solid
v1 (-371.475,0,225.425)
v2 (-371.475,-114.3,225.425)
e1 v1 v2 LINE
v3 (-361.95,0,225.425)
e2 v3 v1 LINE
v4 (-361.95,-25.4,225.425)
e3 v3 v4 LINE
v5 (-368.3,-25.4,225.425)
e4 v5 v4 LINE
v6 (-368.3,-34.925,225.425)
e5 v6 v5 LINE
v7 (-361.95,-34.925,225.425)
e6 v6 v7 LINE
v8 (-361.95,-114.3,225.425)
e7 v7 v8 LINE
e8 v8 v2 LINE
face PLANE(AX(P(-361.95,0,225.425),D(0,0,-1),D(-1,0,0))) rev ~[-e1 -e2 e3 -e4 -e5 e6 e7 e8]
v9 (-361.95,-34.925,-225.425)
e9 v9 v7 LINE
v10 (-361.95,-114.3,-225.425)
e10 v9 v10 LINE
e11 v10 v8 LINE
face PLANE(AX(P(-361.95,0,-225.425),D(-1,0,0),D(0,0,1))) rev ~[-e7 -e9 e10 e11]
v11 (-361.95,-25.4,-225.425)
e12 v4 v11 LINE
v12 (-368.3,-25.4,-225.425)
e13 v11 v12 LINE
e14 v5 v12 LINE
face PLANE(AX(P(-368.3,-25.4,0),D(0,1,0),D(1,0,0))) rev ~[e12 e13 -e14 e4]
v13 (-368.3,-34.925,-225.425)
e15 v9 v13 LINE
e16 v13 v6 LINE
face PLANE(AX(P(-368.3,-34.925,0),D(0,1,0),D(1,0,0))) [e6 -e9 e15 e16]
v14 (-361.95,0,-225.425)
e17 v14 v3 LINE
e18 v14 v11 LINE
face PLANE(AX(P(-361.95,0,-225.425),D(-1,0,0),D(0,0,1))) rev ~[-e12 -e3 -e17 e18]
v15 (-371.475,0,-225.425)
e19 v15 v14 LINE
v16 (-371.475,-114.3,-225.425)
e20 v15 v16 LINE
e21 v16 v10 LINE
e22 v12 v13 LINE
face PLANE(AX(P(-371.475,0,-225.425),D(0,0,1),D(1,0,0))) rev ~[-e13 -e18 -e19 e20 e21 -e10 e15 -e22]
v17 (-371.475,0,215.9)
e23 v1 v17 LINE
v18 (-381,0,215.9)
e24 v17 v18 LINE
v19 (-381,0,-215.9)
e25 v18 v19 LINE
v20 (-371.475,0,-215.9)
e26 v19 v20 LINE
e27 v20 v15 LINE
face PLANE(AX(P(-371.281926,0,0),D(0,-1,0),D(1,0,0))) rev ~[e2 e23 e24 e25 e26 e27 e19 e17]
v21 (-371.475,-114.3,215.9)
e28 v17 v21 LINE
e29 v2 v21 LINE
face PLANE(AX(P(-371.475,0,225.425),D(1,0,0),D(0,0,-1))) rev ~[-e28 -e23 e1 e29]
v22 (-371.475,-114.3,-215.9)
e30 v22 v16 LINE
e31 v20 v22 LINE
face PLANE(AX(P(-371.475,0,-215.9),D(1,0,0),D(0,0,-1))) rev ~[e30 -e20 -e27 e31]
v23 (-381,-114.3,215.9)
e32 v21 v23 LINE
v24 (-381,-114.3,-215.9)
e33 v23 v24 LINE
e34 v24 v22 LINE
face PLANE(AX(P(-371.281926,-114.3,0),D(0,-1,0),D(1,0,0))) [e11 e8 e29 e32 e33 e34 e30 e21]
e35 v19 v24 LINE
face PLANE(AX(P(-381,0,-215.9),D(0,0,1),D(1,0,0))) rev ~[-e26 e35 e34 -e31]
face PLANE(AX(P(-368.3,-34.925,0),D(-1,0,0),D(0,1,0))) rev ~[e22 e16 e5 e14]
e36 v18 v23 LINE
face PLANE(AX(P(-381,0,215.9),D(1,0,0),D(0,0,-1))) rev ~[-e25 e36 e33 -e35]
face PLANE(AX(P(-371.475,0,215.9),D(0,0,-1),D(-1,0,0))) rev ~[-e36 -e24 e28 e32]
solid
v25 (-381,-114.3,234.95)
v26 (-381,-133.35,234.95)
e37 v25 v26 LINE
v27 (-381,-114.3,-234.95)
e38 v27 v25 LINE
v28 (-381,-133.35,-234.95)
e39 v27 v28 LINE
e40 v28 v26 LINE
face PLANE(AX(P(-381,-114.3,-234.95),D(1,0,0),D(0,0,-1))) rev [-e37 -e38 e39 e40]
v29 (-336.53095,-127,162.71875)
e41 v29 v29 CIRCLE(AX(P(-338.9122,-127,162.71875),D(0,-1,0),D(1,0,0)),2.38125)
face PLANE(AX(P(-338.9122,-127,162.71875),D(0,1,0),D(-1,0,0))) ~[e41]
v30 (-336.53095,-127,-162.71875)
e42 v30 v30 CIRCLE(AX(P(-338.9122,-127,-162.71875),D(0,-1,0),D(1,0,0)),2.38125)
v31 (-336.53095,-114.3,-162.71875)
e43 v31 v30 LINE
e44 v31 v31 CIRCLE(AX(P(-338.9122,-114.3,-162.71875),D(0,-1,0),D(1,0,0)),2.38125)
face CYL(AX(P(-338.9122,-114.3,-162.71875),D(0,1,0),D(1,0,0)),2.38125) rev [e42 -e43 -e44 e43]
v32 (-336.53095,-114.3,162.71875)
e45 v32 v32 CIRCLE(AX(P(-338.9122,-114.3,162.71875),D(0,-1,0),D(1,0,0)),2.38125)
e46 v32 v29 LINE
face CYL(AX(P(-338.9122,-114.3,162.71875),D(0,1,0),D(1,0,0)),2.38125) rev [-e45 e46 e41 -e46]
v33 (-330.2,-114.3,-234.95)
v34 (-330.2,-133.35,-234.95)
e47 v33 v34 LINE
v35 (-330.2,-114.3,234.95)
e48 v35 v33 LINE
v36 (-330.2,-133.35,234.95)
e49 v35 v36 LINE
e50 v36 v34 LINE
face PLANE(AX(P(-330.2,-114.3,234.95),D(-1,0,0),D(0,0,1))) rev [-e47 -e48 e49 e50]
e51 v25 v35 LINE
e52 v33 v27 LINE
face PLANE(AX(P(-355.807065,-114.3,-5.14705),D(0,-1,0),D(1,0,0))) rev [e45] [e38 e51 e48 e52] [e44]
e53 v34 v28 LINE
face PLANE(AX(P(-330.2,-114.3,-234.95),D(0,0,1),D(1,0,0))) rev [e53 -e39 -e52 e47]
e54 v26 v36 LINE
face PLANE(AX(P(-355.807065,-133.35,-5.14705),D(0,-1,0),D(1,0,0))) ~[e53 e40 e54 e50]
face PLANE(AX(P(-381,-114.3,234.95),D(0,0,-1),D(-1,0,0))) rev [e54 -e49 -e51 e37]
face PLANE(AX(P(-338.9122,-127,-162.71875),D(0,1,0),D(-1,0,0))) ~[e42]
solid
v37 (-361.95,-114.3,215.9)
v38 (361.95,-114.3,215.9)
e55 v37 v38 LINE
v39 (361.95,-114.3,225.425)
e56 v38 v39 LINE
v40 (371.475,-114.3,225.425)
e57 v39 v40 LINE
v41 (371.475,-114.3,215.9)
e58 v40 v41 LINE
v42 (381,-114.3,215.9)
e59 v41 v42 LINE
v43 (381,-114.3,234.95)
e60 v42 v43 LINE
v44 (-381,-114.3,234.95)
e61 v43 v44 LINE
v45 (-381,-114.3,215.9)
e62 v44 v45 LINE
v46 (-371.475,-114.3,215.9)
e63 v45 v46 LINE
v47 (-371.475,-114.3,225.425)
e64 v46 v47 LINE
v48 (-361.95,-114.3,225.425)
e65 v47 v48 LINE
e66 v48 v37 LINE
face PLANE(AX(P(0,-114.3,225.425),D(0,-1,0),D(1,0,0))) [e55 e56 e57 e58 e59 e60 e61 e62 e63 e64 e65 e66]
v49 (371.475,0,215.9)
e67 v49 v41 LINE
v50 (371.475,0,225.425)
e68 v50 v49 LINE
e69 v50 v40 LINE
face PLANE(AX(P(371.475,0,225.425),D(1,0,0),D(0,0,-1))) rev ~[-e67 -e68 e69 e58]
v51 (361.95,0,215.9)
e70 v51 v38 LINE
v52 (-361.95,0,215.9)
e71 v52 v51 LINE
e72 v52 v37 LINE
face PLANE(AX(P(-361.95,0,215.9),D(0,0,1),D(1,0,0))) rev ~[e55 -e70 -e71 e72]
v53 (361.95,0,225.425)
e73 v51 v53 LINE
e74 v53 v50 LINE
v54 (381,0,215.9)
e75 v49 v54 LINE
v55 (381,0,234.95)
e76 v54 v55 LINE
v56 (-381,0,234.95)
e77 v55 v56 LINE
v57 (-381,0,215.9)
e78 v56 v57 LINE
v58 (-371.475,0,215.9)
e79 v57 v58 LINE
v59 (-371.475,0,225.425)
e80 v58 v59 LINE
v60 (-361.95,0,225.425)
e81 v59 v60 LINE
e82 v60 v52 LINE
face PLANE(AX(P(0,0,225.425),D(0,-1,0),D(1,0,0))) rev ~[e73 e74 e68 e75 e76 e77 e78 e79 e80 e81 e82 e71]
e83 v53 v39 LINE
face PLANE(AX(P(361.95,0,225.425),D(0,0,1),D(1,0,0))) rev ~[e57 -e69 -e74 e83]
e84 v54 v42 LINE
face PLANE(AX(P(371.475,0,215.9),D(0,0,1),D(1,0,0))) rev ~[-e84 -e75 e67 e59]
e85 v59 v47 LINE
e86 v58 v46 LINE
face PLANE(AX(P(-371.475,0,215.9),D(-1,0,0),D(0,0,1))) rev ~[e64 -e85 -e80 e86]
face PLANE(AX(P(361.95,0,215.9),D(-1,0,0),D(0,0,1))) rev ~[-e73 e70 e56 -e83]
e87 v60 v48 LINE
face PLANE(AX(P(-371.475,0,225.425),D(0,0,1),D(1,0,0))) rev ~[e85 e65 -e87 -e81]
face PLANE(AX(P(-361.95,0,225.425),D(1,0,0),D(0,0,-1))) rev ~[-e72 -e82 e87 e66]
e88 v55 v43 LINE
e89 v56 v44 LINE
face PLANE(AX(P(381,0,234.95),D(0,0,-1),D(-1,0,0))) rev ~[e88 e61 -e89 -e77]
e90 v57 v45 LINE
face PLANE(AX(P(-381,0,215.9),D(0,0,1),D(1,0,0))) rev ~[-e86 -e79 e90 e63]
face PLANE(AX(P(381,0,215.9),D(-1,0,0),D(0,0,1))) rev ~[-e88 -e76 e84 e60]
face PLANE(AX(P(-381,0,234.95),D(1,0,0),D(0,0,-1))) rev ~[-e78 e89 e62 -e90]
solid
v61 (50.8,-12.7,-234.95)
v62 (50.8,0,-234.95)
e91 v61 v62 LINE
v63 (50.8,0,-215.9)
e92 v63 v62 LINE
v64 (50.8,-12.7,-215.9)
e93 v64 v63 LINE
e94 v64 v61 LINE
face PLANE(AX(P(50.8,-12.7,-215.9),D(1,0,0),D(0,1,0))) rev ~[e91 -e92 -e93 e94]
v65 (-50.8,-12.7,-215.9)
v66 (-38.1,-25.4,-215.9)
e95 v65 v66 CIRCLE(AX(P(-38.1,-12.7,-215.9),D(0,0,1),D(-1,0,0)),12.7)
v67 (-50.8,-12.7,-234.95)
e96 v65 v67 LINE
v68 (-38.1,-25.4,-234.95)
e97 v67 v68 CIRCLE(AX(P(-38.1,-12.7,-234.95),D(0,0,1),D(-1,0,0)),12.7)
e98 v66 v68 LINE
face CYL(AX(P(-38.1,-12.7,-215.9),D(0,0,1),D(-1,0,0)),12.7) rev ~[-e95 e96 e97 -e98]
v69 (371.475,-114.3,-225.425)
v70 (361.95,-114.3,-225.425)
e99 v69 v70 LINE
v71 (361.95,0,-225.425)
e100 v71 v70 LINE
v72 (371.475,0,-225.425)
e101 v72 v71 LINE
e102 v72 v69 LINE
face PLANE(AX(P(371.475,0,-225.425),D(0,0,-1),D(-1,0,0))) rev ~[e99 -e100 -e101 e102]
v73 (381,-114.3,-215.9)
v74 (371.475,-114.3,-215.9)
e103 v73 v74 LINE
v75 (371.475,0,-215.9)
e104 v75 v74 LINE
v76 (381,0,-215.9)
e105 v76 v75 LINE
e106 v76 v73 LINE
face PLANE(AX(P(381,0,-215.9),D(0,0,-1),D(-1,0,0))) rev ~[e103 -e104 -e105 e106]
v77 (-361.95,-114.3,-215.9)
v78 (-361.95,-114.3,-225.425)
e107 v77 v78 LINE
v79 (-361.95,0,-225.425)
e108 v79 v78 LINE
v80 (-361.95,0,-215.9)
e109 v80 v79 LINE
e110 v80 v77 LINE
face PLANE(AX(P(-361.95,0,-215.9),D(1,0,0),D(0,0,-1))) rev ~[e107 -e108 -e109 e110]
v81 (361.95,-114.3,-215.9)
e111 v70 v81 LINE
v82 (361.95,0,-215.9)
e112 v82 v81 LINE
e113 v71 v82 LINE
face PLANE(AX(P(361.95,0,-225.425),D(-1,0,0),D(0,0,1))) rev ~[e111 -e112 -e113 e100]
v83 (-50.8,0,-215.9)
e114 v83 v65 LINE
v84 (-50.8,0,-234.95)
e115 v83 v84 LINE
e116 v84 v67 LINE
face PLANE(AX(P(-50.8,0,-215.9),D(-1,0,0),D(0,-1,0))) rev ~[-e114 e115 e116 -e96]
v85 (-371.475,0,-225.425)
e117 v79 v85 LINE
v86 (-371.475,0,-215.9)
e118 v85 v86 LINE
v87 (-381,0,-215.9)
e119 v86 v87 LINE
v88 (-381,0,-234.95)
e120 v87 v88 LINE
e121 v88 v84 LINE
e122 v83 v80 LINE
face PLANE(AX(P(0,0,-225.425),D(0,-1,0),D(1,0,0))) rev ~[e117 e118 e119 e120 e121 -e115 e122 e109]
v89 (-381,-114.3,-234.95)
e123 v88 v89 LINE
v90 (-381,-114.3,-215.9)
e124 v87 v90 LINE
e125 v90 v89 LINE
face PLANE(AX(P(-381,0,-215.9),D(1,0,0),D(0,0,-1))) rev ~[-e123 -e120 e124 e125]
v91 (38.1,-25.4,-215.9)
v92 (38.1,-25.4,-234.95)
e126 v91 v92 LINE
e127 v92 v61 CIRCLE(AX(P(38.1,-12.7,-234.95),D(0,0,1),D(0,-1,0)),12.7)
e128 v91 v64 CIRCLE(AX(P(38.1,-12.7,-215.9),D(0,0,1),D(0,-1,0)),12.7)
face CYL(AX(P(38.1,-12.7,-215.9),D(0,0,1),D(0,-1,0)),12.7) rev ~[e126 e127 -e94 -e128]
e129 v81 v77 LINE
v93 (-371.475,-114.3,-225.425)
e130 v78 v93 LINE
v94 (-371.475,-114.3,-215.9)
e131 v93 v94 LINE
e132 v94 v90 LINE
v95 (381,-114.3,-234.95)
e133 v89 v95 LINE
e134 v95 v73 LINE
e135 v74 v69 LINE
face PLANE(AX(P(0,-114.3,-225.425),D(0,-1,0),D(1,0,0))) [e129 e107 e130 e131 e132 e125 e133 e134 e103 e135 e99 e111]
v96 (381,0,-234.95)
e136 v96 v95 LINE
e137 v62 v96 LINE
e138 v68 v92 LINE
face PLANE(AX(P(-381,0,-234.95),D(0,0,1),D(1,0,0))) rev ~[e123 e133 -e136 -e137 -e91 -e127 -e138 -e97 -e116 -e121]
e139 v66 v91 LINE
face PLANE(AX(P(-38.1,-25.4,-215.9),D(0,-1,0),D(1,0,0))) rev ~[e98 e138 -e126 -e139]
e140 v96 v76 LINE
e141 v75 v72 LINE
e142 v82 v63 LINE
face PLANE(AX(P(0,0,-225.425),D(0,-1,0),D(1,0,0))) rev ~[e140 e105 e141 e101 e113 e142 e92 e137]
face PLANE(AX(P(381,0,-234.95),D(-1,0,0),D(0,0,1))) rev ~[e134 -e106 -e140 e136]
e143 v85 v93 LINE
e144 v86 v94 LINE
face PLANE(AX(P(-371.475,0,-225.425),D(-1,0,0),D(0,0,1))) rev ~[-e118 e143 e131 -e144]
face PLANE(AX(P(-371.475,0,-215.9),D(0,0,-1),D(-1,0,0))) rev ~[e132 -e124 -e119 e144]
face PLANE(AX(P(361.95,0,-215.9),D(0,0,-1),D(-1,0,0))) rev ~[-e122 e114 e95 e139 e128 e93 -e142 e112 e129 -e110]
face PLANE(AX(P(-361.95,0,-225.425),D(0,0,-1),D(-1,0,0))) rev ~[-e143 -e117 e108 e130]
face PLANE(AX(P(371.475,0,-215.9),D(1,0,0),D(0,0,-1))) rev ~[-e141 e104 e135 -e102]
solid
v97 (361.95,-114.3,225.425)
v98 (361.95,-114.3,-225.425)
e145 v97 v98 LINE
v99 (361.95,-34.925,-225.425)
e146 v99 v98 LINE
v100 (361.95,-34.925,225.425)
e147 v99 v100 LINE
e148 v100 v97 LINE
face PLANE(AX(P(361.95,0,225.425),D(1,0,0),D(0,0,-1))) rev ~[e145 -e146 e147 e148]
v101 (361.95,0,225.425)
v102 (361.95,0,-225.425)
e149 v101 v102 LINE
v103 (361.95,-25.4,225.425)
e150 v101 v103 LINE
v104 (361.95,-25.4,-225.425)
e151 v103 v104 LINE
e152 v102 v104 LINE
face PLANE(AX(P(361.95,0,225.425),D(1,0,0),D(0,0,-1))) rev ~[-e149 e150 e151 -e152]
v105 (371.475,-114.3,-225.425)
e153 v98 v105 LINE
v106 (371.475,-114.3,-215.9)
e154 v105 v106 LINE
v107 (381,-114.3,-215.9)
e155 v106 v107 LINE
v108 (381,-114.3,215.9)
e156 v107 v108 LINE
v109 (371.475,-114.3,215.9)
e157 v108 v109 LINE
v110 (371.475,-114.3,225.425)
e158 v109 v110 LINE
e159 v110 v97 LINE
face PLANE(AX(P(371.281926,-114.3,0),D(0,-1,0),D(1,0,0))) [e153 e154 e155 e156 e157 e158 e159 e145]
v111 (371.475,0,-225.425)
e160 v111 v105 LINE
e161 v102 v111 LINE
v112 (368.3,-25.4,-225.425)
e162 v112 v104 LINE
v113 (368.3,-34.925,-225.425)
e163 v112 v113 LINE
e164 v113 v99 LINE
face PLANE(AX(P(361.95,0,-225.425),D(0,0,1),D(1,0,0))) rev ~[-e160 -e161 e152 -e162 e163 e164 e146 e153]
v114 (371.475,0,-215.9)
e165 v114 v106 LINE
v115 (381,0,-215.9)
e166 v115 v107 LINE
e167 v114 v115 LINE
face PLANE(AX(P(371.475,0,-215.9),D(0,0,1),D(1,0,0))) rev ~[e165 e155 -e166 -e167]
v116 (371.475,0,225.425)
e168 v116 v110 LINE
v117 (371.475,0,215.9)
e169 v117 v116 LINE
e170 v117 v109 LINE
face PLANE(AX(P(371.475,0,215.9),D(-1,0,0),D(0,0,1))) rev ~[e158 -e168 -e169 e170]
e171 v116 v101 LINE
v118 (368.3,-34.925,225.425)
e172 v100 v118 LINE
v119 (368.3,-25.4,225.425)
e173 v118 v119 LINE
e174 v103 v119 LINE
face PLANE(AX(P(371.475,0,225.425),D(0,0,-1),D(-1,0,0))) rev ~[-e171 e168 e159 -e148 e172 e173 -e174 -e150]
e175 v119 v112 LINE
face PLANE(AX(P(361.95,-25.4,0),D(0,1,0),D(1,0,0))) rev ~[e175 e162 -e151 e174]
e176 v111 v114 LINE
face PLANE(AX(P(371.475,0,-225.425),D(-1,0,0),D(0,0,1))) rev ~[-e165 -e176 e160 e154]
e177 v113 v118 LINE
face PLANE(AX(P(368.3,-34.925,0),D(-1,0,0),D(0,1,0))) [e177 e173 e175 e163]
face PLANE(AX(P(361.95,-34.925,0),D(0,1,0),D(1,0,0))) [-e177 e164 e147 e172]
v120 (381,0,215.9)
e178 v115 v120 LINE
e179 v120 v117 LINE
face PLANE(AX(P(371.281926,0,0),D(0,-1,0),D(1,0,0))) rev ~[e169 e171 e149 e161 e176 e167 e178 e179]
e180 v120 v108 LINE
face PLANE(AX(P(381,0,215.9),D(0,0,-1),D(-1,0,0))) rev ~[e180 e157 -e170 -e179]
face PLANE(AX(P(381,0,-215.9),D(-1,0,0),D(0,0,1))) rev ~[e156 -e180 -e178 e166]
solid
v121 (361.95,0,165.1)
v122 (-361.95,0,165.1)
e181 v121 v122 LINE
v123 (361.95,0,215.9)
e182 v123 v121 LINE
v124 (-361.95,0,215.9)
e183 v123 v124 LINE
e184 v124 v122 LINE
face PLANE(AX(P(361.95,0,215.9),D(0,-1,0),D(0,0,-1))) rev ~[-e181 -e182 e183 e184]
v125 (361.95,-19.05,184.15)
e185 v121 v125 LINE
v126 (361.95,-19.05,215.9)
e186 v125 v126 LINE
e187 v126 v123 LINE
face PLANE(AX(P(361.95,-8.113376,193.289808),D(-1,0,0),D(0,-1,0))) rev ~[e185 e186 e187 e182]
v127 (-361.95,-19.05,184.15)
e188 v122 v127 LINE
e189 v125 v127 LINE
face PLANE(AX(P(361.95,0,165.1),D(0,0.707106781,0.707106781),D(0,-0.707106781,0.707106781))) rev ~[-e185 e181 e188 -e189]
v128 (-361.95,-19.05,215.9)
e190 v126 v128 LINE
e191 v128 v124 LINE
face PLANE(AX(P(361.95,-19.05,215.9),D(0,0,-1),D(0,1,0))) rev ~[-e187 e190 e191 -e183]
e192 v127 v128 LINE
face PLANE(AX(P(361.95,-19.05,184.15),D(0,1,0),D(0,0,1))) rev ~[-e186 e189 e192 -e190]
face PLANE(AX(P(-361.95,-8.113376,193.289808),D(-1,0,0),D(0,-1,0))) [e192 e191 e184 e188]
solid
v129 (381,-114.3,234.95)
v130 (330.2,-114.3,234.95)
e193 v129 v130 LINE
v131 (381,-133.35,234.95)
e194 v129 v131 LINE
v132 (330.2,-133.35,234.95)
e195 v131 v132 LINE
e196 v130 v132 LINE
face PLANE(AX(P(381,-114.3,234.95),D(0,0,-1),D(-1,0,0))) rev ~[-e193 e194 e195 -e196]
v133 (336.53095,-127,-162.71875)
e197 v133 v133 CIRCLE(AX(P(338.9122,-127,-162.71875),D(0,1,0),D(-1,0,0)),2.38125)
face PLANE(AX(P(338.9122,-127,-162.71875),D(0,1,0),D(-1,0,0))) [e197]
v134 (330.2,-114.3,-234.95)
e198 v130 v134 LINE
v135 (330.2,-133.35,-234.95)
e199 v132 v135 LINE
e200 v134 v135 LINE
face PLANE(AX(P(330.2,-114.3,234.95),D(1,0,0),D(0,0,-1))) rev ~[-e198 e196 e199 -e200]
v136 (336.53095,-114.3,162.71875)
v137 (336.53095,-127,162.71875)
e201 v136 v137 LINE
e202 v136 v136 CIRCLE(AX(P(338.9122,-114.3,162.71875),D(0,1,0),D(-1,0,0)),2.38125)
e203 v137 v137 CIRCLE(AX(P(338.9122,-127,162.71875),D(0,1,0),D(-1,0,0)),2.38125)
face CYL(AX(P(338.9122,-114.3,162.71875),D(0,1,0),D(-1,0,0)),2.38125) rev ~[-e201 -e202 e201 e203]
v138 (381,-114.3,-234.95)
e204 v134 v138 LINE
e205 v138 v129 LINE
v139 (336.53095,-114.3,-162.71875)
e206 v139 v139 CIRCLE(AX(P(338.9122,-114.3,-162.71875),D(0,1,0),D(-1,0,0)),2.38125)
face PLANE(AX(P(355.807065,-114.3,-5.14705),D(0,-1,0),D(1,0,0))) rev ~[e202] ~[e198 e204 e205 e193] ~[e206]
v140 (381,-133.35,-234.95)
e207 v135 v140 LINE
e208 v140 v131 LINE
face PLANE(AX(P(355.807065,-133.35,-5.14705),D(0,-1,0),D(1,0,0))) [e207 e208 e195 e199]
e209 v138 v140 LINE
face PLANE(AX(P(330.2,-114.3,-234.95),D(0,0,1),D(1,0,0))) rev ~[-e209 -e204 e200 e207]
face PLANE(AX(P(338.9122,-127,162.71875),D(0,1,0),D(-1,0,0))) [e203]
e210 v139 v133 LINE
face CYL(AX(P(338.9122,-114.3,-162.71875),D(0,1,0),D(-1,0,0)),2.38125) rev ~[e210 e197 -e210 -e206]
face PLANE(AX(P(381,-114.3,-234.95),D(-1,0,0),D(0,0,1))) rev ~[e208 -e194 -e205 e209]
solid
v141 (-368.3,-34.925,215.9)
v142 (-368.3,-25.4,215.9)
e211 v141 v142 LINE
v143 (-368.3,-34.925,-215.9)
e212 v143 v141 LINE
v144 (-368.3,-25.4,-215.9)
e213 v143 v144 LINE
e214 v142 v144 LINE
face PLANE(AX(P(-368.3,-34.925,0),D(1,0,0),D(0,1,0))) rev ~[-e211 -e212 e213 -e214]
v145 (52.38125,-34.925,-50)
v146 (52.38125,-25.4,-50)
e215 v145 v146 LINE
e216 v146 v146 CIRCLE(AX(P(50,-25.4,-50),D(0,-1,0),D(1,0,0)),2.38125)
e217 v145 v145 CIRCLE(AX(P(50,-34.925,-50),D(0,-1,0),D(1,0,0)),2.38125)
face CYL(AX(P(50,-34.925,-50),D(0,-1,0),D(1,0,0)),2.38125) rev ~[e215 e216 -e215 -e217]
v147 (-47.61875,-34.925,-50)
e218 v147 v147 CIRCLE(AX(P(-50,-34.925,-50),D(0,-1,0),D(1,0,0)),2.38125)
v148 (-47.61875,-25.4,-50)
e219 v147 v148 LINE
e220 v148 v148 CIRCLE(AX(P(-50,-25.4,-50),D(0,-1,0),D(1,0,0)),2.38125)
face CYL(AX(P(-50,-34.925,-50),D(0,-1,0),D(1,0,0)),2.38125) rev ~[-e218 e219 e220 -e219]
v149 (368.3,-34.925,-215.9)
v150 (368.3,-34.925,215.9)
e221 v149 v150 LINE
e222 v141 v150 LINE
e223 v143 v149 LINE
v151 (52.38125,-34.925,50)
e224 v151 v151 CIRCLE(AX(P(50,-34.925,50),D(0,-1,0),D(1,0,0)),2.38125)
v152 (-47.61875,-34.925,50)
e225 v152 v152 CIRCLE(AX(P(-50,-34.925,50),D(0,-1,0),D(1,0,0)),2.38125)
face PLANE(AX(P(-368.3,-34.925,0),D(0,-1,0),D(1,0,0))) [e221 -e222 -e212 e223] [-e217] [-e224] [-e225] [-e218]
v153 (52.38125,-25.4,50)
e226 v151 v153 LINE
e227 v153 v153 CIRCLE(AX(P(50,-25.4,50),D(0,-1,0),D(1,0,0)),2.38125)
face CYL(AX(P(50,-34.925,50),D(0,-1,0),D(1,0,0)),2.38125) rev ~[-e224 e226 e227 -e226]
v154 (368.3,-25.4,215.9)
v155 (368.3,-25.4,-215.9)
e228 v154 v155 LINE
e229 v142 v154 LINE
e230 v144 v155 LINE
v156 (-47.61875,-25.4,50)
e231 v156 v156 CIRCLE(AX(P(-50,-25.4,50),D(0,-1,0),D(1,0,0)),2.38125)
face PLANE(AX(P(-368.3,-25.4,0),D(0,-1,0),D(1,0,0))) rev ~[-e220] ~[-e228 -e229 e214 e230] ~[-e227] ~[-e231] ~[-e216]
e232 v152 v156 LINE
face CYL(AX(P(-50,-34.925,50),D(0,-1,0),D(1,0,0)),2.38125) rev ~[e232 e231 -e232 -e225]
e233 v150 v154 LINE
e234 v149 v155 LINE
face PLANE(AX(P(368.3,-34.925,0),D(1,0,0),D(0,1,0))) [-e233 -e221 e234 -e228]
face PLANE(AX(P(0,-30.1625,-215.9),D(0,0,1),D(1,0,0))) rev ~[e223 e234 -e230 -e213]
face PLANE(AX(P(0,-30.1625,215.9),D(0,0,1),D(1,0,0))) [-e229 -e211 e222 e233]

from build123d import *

# Parameters (mm, degrees)
F4_DEPTH       = 114.3
F5_W           = 6.35
F5_H           = 9.525
F6_DEPTH       = 234.951
F6_DEPTH_BACK  = 234.951
F8_DEPTH       = 19.05
F10_DEPTH      = 25.4
F12_DEPTH      = 723.9
F13_R          = 2.38125
F14_DEPTH      = 12.7
F15_W          = 736.6
F15_H          = 9.525
F16_DEPTH      = 215.9
F16_DEPTH_BACK = 215.9
F18_R          = 2.38125
F19_DEPTH      = 34.926


with BuildPart() as f4:
    # F1 (on Front) → F4 (new body)
    with BuildSketch(Plane.XZ):
        Polygon((381, 234.95), (-381, 234.95), (-381, 215.9), (-371.475, 215.9), (-371.475, 225.425), (-361.95, 225.425), (-361.95, 215.9), (361.95, 215.9), (361.95, 225.425), (371.475, 225.425), (371.475, 215.9), (381, 215.9), align=None)
    extrude(amount=F4_DEPTH)


with BuildPart() as f4b:
    # F3 (on Front) → F4, piece 2 (new body)
    with BuildSketch(Plane.XZ):
        Polygon((-371.475, 215.9), (-381, 215.9), (-381, -215.9), (-371.475, -215.9), (-371.475, -225.425), (-361.95, -225.425), (-361.95, -215.9), (-361.95, 215.9), (-361.95, 225.425), (-371.475, 225.425), align=None)
    extrude(amount=F4_DEPTH)


with BuildPart() as f4c:
    # F3 (on Front) → F4, piece 3 (new body)
    with BuildSketch(Plane.XZ):
        Polygon((381, 215.9), (371.475, 215.9), (371.475, 225.425), (361.95, 225.425), (361.95, 215.9), (361.95, -215.9), (361.95, -225.425), (371.475, -225.425), (371.475, -215.9), (381, -215.9), align=None)
    extrude(amount=F4_DEPTH)


with BuildPart() as f4d:
    # F2 (on Front) → F4, piece 4 (new body)
    with BuildSketch(Plane.XZ):
        Polygon((-381, -215.9), (-381, -234.95), (381, -234.95), (381, -215.9), (371.475, -215.9), (371.475, -225.425), (361.95, -225.425), (361.95, -215.9), (-361.95, -215.9), (-361.95, -225.425), (-371.475, -225.425), (-371.475, -215.9), align=None)
    extrude(amount=F4_DEPTH)

    # F9 (on face) → F10 (cut)
    with BuildSketch(Plane.XY.offset(-215.9)):
        with BuildLine():
            Line((50.8, 0), (-50.8, 0))
            Line((-50.8, 0), (-50.8, -12.7))
            ThreePointArc((-50.8, -12.7), (-47.0802561211, -21.6802561211), (-38.1, -25.4))
            Line((-38.1, -25.4), (38.1, -25.4))
            ThreePointArc((38.1, -25.4), (47.0802561211, -21.6802561211), (50.8, -12.7))
            Line((50.8, -12.7), (50.8, 0))
        make_face()
    extrude(amount=-F10_DEPTH, mode=Mode.SUBTRACT)


with BuildPart() as f6_tool:
    # F5 (on Top) → F6 (new body, two sides)
    with BuildSketch(Plane.XY) as f6_sk:
        with Locations((-365.125, -30.1625)):
            Rectangle(F5_W, F5_H)
        with Locations((365.125, -30.1625)):
            Rectangle(F5_W, F5_H)
    extrude(amount=-F6_DEPTH)
    extrude(f6_sk.sketch, amount=F6_DEPTH_BACK)


with BuildPart() as f4b_1:
    add(f4b.part)

    # F6: cut by f6_tool
    add(f6_tool.part, mode=Mode.SUBTRACT)


with BuildPart() as f4c_1:
    add(f4c.part)

    # F6: cut by f6_tool
    add(f6_tool.part, mode=Mode.SUBTRACT)


with BuildPart() as f8:
    # F7 (on face) → F8 (new body)
    with BuildSketch(Plane.XZ.offset(114.3)):
        Polygon((361.95, 215.9), (330.2, 215.9), (330.2, -234.95), (381, -234.95), (381, 215.9), (371.475, 215.9), (371.475, 225.425), (361.95, 225.425), align=None)
        Polygon((381, 234.95), (330.2, 234.95), (330.2, 215.9), (361.95, 215.9), (361.95, 225.425), (371.475, 225.425), (371.475, 215.9), (381, 215.9), align=None)
    extrude(amount=F8_DEPTH)

    # F13 (on face) → F14 (cut)
    with BuildSketch(Plane(origin=(0, -114.3, 0), x_dir=(-1, 0, 0), z_dir=(0, 1, 0))):
        with Locations((-338.9122, 162.71875)):
            Circle(F13_R)
        with Locations((-338.9122, -162.71875)):
            Circle(F13_R)
    extrude(amount=-F14_DEPTH, mode=Mode.SUBTRACT)


with BuildPart() as f12:
    # F11 (on face) → F12 (new body, through all)
    with BuildSketch(Plane(origin=(361.95, 0, 0), x_dir=(0, -1, 0), z_dir=(-1, 0, 0))):
        Polygon((19.05, 215.9), (0, 215.9), (0, 165.1), (19.05, 184.15), align=None)
    extrude(amount=F12_DEPTH)


with BuildPart() as f16:
    # F15 (on Top) → F16 (new body, two sides)
    with BuildSketch(Plane.XY) as f16_sk:
        with Locations((0, -30.1625)):
            Rectangle(F15_W, F15_H)
    extrude(amount=F16_DEPTH)
    extrude(f16_sk.sketch, amount=-F16_DEPTH_BACK)

    # F18 (on face) → F19 (cut, through all)
    with BuildSketch(Plane.XZ.offset(34.925)):
        with Locations((-50, 50)):
            Circle(F18_R)
        with Locations((50, 50)):
            Circle(F18_R)
        with Locations((-50, -50)):
            Circle(F18_R)
        with Locations((50, -50)):
            Circle(F18_R)
    extrude(amount=-F19_DEPTH, mode=Mode.SUBTRACT)


with BuildPart() as f17_1:
    # F17: instance of F8
    add(f8.part.mirror(Plane.YZ))


solid = Compound([f4.part, f4d.part, f4b_1.part, f4c_1.part, f8.part, f12.part, f16.part, f17_1.part])
